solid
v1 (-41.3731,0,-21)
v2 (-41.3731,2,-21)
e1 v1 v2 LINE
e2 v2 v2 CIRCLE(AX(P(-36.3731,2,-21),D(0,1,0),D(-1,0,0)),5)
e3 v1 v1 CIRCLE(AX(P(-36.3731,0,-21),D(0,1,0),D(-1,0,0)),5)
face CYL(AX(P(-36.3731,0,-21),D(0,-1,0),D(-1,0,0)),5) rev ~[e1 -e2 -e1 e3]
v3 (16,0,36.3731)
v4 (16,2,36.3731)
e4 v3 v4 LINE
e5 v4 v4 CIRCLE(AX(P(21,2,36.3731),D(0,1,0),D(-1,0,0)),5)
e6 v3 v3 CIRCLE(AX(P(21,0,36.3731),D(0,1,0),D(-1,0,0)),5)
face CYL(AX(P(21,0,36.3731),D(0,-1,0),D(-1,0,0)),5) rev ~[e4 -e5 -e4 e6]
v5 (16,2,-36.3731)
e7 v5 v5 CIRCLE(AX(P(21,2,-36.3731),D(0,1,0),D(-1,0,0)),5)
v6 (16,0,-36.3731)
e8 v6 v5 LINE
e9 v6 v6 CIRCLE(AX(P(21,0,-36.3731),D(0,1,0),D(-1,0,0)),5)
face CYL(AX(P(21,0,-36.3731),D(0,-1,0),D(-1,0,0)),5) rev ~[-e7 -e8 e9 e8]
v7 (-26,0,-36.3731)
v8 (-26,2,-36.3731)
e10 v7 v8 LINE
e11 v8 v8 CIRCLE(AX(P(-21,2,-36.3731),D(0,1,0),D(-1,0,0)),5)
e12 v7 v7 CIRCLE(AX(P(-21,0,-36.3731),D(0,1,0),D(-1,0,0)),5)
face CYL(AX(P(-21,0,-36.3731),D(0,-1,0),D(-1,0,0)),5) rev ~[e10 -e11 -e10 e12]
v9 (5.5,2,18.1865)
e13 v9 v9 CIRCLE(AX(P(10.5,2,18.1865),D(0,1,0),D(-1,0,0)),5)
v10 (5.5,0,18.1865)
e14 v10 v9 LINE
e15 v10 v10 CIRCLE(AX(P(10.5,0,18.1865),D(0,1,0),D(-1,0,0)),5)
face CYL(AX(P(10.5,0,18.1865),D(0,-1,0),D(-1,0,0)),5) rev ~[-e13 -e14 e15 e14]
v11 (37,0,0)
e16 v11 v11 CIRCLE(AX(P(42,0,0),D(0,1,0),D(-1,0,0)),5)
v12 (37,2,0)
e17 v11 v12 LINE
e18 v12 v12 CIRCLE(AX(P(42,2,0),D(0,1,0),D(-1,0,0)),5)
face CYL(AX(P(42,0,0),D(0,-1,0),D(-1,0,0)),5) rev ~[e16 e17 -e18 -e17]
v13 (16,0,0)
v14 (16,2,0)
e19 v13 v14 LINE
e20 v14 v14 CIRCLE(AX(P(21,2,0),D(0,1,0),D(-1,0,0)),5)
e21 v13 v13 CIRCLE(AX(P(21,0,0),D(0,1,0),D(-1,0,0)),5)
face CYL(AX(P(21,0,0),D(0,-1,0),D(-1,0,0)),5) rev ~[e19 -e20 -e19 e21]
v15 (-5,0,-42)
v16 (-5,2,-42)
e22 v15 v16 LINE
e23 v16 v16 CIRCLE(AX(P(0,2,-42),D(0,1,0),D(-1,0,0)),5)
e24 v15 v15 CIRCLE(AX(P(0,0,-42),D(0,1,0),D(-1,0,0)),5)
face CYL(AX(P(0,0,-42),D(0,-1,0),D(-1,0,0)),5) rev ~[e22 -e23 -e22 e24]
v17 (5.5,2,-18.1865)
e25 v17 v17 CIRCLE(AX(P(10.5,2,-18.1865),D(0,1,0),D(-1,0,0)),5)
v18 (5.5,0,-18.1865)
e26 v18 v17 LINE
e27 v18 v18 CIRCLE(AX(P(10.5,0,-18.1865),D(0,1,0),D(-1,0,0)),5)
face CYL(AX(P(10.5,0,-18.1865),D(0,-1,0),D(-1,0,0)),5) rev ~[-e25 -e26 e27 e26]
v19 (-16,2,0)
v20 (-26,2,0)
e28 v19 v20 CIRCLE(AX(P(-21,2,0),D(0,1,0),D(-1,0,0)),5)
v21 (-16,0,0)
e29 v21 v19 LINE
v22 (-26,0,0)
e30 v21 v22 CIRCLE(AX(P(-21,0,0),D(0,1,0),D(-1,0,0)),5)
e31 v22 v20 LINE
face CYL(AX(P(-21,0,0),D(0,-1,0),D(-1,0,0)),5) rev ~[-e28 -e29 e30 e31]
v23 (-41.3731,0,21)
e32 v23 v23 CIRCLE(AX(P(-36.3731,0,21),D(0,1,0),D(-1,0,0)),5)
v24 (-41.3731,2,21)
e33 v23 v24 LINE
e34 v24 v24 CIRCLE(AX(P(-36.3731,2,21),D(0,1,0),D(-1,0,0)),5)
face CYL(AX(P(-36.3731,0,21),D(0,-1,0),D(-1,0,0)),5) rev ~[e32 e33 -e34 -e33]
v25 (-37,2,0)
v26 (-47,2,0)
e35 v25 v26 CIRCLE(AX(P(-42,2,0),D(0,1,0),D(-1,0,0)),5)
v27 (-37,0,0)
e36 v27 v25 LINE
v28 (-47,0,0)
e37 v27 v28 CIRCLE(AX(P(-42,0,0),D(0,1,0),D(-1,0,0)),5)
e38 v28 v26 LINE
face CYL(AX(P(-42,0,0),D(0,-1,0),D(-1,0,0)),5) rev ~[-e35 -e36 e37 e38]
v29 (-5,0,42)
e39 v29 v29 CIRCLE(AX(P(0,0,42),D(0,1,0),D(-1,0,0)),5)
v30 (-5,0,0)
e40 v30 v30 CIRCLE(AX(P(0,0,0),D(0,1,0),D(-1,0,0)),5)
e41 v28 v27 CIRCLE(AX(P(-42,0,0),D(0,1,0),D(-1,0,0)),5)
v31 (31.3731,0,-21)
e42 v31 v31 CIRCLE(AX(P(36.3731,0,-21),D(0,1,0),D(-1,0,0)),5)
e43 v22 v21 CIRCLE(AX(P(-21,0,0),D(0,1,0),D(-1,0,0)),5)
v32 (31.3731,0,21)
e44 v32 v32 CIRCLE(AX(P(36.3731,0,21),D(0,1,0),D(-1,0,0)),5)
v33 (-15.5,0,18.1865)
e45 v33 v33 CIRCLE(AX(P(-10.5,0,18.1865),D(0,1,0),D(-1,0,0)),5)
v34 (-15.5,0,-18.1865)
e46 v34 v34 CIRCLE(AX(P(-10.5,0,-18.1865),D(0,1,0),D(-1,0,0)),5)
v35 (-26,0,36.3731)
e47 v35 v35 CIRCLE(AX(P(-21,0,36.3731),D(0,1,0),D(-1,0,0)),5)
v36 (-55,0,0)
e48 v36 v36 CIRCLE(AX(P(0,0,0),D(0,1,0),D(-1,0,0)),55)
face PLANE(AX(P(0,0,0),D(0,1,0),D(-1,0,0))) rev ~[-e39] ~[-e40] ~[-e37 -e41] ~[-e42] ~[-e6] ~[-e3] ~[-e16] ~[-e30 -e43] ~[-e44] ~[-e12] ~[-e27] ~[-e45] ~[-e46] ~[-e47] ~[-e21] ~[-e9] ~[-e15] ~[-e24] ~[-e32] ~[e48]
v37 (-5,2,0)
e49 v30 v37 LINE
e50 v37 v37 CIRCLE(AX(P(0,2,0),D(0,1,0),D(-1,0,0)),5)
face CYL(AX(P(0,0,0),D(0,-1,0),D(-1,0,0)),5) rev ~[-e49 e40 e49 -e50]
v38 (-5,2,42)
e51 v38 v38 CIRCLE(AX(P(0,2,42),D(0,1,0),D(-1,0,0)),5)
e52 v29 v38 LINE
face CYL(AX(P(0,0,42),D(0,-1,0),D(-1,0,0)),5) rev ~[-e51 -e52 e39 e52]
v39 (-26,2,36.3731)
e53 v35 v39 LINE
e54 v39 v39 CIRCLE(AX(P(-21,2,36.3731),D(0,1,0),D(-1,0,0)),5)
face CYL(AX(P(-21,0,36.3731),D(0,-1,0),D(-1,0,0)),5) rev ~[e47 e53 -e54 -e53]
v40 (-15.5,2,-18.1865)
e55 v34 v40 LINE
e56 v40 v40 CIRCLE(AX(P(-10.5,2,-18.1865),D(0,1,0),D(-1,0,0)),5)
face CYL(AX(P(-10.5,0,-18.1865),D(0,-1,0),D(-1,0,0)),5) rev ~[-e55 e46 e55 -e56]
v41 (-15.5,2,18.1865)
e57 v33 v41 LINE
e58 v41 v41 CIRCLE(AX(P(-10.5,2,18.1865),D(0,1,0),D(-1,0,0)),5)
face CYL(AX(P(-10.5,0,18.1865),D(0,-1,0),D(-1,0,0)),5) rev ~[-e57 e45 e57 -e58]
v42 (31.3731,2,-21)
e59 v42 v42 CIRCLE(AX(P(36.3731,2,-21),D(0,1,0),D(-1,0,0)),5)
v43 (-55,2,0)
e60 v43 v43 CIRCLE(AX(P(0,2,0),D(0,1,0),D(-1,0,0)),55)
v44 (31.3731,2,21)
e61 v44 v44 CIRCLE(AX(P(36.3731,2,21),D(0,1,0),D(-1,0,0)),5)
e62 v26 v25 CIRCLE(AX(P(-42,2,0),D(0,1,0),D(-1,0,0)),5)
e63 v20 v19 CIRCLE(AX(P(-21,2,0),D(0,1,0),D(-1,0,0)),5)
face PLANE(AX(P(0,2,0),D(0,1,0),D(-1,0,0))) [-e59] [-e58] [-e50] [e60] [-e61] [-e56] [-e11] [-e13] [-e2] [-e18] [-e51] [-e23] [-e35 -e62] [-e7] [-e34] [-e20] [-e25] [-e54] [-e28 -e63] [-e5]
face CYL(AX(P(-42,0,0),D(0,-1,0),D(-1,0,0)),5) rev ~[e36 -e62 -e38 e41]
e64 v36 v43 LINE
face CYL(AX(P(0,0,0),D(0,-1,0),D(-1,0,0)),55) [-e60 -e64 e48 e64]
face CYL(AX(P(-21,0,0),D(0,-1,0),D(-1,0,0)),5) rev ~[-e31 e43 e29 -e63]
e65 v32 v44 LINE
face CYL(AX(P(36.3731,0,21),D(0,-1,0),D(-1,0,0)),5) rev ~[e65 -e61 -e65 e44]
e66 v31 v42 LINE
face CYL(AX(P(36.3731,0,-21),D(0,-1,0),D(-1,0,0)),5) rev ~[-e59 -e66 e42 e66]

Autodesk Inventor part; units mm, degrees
ref_plane "YZ Plane" through (0, 0, 0) normal (1, 0, 0) x (0, 1, 0)
ref_plane "XZ Plane" through (0, 0, 0) normal (0, 1, 0) x (-1, 0, 0)
ref_plane "XY Plane" through (0, 0, 0) normal (0, 0, 1) x (1, 0, 0)
sketch "Sketch1" plane through (0, 0, 0) normal (0, 1, 0) x (-1, 0, 0)
  circle A0 centre (0, 0) radius 55
  line L0 (0, 0) -> (15, 0)
  circle A1 centre (0, 0) radius 8 construction
  line L1 (0, 0) -> (21, 0)
  circle A2 centre (21, 0) radius 8 construction
  line L2 (0, 0) -> (42, 0)
  circle A3 centre (42, 0) radius 8 construction
  circle A4 centre (0, 0) radius 5
  circle A5 centre (21, 0) radius 5
  circle A6 centre (10.5, 18.1865) radius 5
  circle A7 centre (-10.5, 18.1865) radius 5
  circle A8 centre (-21, 0) radius 5
  circle A9 centre (-10.5, -18.1865) radius 5
  circle A10 centre (10.5, -18.1865) radius 5
  circle A11 centre (42, 0) radius 5
  circle A12 centre (36.3731, 21) radius 5
  circle A13 centre (21, 36.3731) radius 5
  circle A14 centre (0, 42) radius 5
  circle A15 centre (-21, 36.3731) radius 5
  circle A16 centre (-36.3731, 21) radius 5
  circle A17 centre (-42, 0) radius 5
  circle A18 centre (-36.3731, -21) radius 5
  circle A19 centre (-21, -36.3731) radius 5
  circle A20 centre (0, -42) radius 5
  circle A21 centre (21, -36.3731) radius 5
  circle A22 centre (36.3731, -21) radius 5
  dimension "d0" = 110
  dimension "d4" = 15
  dimension "d6" = 16
  dimension "d7" = 21
  dimension "d8" = 16
  dimension "d14" = 42
  dimension "d15" = 16
  dimension "d20" = 10
  dimension "d21" = 10
  dimension "d24" = 360
  dimension "d26" = 10
  dimension "d29" = 360
extrude "Extrusion1" add sketch "Sketch1" along normal blind 2
properties part number "separator_v2" material "Brass, Soft Yellow, Welded"
